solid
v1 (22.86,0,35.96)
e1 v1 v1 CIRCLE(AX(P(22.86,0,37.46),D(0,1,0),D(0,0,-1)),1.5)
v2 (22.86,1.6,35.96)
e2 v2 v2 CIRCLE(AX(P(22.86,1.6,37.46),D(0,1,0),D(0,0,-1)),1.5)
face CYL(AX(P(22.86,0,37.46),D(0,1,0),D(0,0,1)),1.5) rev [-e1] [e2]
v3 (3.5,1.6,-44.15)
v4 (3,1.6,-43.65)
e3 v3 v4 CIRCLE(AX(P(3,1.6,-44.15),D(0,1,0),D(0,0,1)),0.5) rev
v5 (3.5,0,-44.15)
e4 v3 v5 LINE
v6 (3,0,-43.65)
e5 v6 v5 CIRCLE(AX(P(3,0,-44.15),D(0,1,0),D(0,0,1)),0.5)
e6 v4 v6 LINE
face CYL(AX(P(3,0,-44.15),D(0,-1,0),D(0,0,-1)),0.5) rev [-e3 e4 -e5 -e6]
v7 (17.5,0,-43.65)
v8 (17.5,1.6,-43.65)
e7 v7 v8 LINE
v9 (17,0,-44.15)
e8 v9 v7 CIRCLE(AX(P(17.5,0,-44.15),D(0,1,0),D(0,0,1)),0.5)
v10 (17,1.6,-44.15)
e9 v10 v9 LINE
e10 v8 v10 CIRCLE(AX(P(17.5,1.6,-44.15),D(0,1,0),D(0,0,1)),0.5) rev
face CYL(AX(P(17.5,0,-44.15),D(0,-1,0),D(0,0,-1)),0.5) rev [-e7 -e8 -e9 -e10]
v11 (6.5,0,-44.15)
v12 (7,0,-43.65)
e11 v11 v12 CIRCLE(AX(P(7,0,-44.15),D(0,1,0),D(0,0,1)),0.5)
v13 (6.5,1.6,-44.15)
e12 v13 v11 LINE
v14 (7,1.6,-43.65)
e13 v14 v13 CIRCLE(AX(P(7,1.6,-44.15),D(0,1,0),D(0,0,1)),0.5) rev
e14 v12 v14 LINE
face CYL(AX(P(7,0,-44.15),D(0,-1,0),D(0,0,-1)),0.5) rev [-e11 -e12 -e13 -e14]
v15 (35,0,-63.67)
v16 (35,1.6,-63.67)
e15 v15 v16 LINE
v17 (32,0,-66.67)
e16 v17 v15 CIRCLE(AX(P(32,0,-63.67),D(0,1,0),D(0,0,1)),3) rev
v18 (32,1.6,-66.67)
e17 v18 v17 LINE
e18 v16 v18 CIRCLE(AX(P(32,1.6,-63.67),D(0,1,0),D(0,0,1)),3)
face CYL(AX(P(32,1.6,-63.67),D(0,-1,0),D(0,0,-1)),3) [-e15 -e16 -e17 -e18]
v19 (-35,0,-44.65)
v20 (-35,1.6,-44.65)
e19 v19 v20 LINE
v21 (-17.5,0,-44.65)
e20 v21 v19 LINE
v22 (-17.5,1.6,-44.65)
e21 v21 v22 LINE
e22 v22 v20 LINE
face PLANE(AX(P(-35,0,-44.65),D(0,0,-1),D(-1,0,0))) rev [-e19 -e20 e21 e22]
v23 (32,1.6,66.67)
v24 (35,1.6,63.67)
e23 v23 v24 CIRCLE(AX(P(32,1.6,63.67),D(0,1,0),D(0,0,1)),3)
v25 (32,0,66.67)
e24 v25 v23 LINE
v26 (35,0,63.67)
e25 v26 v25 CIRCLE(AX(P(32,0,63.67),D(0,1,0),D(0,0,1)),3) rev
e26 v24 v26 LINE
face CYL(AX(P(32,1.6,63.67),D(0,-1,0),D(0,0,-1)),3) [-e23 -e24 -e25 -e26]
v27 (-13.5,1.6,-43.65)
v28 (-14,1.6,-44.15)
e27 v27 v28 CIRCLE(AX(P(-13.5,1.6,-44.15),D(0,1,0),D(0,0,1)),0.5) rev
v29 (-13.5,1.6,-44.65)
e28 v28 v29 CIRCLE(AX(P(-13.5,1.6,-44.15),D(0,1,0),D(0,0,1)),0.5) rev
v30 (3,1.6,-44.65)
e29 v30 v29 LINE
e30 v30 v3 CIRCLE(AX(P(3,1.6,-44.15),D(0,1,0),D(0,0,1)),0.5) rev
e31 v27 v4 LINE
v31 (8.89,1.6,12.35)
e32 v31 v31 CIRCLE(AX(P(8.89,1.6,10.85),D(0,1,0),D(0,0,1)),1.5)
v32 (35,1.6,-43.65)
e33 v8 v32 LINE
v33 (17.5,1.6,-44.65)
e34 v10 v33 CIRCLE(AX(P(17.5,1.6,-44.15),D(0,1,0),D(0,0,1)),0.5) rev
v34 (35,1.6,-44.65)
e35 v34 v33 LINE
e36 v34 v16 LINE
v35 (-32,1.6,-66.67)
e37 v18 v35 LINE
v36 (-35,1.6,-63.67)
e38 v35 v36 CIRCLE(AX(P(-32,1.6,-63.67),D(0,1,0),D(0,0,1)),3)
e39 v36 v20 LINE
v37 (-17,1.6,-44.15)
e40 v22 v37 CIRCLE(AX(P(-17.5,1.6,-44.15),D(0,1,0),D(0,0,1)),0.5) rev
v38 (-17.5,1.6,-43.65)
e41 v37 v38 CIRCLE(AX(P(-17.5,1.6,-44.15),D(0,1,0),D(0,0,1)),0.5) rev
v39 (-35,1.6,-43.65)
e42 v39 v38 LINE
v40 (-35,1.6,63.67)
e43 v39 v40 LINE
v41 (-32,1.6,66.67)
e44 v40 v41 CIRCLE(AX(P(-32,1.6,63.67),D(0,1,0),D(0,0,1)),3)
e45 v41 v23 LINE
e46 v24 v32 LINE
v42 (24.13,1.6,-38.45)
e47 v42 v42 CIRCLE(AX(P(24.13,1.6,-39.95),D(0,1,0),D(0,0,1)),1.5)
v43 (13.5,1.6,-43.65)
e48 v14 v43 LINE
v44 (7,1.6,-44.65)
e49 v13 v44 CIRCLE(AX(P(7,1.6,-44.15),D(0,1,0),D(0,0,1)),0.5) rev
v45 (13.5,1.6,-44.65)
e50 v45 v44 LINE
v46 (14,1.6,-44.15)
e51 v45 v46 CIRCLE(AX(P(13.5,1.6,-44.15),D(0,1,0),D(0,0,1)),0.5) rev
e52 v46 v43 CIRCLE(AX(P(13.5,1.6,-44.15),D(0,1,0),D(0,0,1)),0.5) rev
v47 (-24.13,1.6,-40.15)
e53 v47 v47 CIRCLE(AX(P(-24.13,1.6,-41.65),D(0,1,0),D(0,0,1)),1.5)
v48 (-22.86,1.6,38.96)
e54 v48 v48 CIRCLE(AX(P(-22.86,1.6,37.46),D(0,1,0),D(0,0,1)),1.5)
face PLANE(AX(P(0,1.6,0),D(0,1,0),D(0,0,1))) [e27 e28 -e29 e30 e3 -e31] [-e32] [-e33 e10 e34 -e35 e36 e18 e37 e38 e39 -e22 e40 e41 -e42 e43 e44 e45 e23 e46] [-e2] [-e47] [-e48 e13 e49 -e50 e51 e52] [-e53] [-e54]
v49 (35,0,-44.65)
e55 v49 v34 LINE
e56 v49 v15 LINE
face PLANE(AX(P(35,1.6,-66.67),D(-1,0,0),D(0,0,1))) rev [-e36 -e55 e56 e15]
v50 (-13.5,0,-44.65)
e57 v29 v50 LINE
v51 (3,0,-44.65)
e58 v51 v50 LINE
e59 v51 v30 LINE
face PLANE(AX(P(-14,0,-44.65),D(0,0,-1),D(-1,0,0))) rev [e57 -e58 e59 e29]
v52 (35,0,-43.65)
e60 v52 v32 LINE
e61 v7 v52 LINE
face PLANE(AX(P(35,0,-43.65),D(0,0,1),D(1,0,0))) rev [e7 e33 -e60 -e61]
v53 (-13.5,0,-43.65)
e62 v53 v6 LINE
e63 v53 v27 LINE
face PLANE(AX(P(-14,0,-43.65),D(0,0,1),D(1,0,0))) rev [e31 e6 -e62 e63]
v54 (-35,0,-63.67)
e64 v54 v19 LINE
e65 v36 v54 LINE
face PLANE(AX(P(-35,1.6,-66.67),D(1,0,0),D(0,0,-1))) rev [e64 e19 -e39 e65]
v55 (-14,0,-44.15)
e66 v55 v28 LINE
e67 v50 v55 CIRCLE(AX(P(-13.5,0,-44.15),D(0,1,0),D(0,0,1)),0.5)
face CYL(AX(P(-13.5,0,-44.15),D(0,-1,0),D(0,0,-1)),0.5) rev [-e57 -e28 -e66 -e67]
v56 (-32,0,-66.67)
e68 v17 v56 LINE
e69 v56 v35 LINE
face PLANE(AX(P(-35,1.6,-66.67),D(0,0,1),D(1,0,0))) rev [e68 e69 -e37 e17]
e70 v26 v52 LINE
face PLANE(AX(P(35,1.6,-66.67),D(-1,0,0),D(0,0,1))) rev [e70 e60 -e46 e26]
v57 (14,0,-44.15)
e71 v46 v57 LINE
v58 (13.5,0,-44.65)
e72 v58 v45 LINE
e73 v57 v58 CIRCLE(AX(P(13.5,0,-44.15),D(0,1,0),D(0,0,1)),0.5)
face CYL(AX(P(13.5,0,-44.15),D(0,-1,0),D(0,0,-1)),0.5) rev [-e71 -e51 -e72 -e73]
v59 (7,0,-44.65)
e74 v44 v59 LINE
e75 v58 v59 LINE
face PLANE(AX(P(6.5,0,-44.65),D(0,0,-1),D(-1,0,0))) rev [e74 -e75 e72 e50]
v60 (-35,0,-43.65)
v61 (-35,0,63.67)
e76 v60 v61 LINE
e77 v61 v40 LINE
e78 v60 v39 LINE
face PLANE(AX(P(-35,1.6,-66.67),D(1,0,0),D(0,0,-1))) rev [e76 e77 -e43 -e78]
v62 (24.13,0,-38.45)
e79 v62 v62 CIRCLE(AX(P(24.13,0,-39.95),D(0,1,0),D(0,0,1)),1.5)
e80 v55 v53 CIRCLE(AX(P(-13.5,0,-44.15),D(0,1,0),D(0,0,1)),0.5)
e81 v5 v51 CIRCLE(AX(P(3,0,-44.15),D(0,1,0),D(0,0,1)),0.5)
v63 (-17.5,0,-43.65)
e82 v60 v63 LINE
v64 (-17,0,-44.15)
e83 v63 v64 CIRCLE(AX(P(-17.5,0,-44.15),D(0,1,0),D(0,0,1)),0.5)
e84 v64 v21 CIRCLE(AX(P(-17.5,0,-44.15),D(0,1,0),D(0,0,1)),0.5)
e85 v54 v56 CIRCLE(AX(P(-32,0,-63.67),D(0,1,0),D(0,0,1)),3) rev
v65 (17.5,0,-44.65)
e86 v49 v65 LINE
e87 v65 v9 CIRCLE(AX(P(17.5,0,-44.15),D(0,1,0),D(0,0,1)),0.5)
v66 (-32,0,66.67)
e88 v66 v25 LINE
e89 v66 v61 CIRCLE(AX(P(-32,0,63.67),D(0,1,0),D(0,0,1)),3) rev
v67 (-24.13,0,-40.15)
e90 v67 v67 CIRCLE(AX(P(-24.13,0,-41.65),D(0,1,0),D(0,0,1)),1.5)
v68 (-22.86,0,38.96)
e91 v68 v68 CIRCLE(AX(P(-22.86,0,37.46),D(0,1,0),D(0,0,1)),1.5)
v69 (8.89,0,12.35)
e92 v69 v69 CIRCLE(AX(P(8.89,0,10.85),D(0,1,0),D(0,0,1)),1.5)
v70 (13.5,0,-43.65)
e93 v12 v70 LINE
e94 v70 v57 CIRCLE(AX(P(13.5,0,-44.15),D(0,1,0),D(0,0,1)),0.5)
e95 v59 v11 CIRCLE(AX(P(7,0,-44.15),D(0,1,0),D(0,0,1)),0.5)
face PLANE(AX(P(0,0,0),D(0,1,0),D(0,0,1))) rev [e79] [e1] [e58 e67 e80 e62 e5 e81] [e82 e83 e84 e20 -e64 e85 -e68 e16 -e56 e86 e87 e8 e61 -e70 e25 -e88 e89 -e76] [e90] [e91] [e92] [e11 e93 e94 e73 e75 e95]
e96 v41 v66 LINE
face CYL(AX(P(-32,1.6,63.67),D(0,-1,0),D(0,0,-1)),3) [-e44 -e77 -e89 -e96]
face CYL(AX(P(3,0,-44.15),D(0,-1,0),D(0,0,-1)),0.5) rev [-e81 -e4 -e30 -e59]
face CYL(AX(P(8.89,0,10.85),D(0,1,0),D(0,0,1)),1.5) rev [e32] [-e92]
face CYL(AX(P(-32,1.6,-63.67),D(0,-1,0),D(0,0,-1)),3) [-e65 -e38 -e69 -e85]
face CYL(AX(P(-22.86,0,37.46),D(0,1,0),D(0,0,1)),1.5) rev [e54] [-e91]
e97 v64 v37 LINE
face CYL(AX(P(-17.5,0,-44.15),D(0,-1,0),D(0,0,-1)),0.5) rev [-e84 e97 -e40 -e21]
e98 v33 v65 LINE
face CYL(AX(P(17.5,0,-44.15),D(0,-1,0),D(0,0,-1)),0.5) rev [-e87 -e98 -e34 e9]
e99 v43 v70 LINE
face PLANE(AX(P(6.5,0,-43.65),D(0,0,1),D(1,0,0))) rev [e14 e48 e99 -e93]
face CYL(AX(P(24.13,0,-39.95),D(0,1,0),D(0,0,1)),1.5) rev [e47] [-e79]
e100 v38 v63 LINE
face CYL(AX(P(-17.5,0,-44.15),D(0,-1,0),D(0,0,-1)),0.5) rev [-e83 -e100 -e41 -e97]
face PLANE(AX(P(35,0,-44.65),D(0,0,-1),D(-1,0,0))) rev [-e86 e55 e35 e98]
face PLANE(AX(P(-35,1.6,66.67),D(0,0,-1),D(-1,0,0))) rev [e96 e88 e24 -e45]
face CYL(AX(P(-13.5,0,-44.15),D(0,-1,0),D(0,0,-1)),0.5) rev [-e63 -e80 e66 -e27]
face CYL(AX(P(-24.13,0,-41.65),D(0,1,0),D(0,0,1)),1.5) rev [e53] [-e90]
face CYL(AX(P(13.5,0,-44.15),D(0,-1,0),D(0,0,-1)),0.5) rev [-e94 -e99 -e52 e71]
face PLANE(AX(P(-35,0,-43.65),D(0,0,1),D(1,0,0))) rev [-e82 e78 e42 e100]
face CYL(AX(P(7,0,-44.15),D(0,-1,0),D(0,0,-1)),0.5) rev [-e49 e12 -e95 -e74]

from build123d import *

# Parameters (mm, degrees)
SKETCH_1_W          = 70
SKETCH_1_H          = 133.34
EXTRUDE_1_DEPTH     = 1.6
SKETCH_2_R          = 1.5
SKETCH_2_W          = 18
SKETCH_2_H          = 1
SKETCH_2_W_2        = 17.5
SKETCH_2_W_3        = 7.5
CUT_EXTRUDE_1_DEPTH = 76.315661718
FILLET_1_R          = 3
FILLET_2_R          = 0.5


with BuildPart() as part:
    # ｽｹｯﾁ1 → ﾎﾞｽ - 押し出し1 (new body)
    with BuildSketch(Plane(origin=(0, 0, 0), x_dir=(1, 0, 0), z_dir=(0, 1, 0))):
        Rectangle(SKETCH_1_W, SKETCH_1_H)
    extrude(amount=EXTRUDE_1_DEPTH)

    # ｽｹｯﾁ2 → ｶｯﾄ - 押し出し1 (cut, through all)
    with BuildSketch(Plane(origin=(0, 1.6, 0), x_dir=(1, 0, 0), z_dir=(0, 1, 0))):
        with Locations(Location((-22.86, -37.46, 0), (0, 0, 270))):
            Circle(SKETCH_2_R)
        with Locations(Location((22.86, -37.46, 0), (0, 0, 90))):
            Circle(SKETCH_2_R)
        with Locations(Location((-24.13, 41.65, 0), (0, 0, 270))):
            Circle(SKETCH_2_R)
        with Locations(Location((24.13, 39.95, 0), (0, 0, 270))):
            Circle(SKETCH_2_R)
        with Locations(Location((8.89, -10.85, 0), (0, 0, 270))):
            Circle(SKETCH_2_R)
        with Locations((-26, 44.15)):
            Rectangle(SKETCH_2_W, SKETCH_2_H)
        with Locations((26, 44.15)):
            Rectangle(SKETCH_2_W, SKETCH_2_H)
        with Locations((-5.25, 44.15)):
            Rectangle(SKETCH_2_W_2, SKETCH_2_H)
        with Locations((10.25, 44.15)):
            Rectangle(SKETCH_2_W_3, SKETCH_2_H)
    extrude(amount=-CUT_EXTRUDE_1_DEPTH, mode=Mode.SUBTRACT)

    # ﾌｨﾚｯﾄ1
    fillet_1_edges = [part.edges().sort_by_distance(p)[0] for p in [
        (35, 0.8, 66.67),
        (-35, 0.8, 66.67),
        (-35, 0.8, -66.67),
        (35, 0.8, -66.67),
    ]]
    fillet(fillet_1_edges, radius=FILLET_1_R)

    # ﾌｨﾚｯﾄ2
    fillet_2_edges = [part.edges().sort_by_distance(p)[0] for p in [
        (17, 0.8, -44.65),
        (17, 0.8, -43.65),
        (14, 0.8, -43.65),
        (14, 0.8, -44.65),
        (6.5, 0.8, -44.65),
        (6.5, 0.8, -43.65),
        (3.5, 0.8, -43.65),
        (3.5, 0.8, -44.65),
        (-17, 0.8, -44.65),
        (-17, 0.8, -43.65),
        (-14, 0.8, -43.65),
        (-14, 0.8, -44.65),
    ]]
    fillet(fillet_2_edges, radius=FILLET_2_R - 0.0001)  # a hair under: the kernel refuses the full size


solid = part.part
